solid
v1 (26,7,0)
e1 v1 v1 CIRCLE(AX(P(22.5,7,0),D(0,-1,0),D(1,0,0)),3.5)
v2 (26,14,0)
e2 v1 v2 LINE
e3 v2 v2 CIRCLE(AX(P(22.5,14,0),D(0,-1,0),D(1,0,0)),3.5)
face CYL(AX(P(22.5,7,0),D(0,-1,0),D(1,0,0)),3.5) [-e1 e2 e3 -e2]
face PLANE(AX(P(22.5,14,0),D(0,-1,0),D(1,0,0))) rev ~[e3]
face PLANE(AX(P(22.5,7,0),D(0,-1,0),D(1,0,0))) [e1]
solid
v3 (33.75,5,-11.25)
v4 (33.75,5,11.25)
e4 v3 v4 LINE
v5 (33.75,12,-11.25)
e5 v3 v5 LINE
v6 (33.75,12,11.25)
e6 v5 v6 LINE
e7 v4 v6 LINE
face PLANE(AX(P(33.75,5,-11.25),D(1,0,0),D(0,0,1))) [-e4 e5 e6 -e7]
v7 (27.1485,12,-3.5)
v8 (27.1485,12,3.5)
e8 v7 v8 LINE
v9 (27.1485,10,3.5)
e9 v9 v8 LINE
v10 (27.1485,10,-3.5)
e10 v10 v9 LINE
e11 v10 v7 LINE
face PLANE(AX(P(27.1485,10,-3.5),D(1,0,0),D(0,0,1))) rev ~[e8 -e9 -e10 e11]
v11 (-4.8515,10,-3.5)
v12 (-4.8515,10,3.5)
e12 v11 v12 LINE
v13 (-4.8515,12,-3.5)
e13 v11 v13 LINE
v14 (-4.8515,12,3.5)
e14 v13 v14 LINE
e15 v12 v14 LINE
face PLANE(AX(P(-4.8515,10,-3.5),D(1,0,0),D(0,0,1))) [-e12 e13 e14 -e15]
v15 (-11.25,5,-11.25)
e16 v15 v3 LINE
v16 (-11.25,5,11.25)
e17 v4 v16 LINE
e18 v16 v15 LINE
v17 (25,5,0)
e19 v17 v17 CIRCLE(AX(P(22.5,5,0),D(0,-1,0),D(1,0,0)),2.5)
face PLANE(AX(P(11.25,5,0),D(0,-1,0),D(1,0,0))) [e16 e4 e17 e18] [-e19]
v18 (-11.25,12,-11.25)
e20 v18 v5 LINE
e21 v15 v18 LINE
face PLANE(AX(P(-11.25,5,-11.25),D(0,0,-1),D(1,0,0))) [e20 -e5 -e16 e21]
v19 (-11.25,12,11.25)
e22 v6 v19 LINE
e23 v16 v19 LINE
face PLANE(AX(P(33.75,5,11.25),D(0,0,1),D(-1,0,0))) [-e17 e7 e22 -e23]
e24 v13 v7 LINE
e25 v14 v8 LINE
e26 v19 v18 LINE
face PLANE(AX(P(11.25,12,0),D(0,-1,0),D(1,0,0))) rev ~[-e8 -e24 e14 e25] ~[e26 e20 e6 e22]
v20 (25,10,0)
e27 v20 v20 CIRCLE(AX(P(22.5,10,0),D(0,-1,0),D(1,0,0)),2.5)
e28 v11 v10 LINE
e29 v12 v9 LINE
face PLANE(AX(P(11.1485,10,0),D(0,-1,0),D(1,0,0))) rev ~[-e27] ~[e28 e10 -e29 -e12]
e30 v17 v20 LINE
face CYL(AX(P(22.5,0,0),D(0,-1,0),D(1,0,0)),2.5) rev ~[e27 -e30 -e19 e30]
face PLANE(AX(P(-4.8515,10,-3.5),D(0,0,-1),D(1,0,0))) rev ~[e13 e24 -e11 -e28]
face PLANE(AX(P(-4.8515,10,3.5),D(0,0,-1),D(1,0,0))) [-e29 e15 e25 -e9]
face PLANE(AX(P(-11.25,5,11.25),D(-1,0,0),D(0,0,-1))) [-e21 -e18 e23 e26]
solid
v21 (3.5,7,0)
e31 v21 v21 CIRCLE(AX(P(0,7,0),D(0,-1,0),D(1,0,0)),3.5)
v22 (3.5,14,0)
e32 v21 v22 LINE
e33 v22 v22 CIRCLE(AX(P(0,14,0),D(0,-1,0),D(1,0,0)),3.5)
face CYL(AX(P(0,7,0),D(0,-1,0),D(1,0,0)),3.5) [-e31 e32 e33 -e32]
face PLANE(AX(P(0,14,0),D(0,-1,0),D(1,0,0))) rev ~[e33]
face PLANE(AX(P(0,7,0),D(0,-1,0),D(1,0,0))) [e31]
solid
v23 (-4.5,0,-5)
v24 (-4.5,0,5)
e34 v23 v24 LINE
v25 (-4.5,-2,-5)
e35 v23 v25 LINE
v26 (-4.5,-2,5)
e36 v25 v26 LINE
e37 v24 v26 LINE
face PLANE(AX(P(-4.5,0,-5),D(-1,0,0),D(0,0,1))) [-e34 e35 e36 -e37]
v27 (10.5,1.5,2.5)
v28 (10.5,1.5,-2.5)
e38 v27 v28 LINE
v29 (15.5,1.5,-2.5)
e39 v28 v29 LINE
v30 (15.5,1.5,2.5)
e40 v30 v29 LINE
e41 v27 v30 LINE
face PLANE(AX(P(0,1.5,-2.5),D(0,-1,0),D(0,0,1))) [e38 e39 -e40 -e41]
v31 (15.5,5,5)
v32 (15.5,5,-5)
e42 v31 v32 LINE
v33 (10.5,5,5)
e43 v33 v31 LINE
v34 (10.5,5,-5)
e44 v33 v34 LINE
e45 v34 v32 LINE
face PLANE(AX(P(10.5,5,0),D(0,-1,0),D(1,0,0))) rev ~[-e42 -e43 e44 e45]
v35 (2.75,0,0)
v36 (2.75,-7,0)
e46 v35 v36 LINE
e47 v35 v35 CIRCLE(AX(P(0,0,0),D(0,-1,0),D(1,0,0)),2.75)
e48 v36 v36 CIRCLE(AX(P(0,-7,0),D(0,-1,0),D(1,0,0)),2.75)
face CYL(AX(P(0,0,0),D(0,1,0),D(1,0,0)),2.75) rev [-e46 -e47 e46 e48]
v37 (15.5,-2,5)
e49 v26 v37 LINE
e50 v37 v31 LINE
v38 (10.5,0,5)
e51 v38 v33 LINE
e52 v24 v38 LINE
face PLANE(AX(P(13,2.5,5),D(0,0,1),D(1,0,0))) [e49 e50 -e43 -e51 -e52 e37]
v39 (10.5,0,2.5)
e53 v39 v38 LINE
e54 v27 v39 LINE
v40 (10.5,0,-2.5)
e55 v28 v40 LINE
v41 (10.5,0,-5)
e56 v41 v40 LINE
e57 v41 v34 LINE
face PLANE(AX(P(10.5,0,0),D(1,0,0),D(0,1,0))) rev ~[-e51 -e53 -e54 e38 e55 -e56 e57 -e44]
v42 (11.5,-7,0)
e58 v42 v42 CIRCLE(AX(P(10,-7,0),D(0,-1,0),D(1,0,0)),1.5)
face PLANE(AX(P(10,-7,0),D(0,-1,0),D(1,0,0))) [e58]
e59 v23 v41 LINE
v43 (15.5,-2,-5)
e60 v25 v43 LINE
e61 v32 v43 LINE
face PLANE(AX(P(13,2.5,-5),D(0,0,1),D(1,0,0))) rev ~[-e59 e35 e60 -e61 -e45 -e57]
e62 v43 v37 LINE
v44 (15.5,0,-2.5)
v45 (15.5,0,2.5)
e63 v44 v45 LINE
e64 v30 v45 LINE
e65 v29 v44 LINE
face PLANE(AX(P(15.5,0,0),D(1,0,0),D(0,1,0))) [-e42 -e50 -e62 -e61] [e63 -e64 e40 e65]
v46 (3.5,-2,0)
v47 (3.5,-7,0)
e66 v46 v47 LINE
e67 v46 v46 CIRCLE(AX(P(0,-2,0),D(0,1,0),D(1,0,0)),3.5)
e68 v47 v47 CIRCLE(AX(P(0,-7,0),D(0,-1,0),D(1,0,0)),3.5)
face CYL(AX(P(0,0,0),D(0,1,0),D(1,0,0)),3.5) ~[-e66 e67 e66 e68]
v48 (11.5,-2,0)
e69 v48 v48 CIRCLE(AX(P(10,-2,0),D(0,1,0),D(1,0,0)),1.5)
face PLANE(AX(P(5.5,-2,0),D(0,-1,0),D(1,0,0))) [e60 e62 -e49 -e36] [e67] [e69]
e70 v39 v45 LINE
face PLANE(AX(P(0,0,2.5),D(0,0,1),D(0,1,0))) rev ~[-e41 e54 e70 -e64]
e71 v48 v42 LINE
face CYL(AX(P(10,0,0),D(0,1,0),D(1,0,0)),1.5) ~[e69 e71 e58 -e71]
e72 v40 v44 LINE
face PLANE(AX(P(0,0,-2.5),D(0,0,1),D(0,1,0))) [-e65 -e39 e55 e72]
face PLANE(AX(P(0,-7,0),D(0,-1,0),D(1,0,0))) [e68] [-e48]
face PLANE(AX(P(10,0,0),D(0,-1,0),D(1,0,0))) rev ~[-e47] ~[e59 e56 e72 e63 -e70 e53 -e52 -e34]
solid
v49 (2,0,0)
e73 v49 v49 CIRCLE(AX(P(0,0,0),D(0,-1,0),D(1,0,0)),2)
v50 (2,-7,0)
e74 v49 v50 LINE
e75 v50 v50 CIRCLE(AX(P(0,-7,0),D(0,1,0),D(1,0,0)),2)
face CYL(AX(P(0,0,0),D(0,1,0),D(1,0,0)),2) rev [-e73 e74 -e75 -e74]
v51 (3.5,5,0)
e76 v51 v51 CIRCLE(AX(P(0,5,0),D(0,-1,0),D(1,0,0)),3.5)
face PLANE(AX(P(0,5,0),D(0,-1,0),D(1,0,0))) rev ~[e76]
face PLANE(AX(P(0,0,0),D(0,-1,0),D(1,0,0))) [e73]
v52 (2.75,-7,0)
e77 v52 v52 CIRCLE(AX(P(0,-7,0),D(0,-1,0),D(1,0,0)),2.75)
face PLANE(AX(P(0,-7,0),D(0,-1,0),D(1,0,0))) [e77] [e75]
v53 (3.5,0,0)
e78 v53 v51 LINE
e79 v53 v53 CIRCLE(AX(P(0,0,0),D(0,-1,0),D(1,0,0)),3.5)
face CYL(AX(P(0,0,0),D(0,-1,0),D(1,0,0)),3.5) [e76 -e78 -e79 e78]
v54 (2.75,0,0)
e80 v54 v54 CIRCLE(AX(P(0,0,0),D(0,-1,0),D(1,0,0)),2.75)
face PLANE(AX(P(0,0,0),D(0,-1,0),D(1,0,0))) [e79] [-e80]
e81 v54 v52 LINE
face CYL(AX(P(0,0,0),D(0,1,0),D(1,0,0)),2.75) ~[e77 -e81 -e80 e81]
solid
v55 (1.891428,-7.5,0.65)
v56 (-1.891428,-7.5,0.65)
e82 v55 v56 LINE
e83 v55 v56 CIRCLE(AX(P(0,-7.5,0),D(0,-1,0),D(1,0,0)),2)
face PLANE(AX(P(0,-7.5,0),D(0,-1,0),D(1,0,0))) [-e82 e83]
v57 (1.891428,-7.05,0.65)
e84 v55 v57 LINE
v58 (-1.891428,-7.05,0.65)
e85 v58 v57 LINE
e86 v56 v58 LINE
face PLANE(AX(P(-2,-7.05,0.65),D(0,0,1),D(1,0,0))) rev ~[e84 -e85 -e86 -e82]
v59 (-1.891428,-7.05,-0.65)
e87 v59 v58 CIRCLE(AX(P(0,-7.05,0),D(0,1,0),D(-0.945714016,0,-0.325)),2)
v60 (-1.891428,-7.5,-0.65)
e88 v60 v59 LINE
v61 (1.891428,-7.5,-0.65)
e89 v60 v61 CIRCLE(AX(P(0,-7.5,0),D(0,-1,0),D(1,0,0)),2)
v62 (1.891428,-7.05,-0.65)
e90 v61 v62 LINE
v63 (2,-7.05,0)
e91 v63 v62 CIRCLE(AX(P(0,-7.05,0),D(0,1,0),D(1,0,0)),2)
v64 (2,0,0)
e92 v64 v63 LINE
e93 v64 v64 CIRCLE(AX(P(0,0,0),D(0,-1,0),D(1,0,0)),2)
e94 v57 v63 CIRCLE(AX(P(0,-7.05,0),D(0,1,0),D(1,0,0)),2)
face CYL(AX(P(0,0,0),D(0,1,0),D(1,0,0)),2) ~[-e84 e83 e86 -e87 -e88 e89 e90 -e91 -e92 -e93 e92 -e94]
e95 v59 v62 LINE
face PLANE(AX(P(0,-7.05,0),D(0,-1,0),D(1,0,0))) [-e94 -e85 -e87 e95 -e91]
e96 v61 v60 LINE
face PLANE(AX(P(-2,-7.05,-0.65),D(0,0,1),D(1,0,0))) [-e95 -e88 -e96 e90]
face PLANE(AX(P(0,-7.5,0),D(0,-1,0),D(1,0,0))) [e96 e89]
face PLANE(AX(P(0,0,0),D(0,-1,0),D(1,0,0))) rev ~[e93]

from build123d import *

# Parameters (mm, degrees)
F0_R           = 2.75
F1_DEPTH       = 7
F2_R           = 2
F3_DEPTH       = 9.9
F3_DEPTH_BACK  = 12.8
F4_R           = 3.5
F5_DEPTH       = 5
F6_R           = 2
F7_DEPTH       = 7.5
F9_START       = 7.05
F8_W           = 4
F8_H           = 1.3
F9_DEPTH       = 2
F10_W          = 20
F10_H          = 10
F11_DEPTH      = 2
F12_W          = 5
F12_H          = 5
F13_DEPTH      = 5
F14_W          = 1.5
F14_H          = 2.5
F15_DEPTH      = 22.67
F16_R          = 3.5
F16_R_2        = 2.75
F17_DEPTH      = 7
F18_R          = 2.75
F19_DEPTH      = 6.2
F19_DEPTH_BACK = 3.1
F23_START      = -5
F23_DEPTH      = 7
F25_START      = -7
F24_R          = 3.5
F25_DEPTH      = 7
F27_START      = -10
F26_W          = 32
F26_H          = 7
F27_DEPTH      = 15
F20_R          = 1.5
F28_DEPTH      = 7
F29_R          = 2.5
F30_DEPTH      = 10


with BuildPart() as f1:
    # F0 (on Front) → F1 (new body)
    with BuildSketch(Plane.XZ):
        Circle(F0_R)
    extrude(amount=F1_DEPTH)

    # F2 (on Front) → F3 (cut, two sides)
    with BuildSketch(Plane.XZ) as f3_sk:
        Circle(F2_R)
    extrude(amount=F3_DEPTH, mode=Mode.SUBTRACT)
    extrude(f3_sk.sketch, amount=-F3_DEPTH_BACK, mode=Mode.SUBTRACT)

    # F4 (on Front) → F5 (join)
    with BuildSketch(Plane.XZ):
        Circle(F4_R)
    extrude(amount=-F5_DEPTH)


with BuildPart() as f7:
    # F6 (on Front) → F7 (new body)
    with BuildSketch(Plane.XZ):
        Circle(F6_R)
    extrude(amount=F7_DEPTH)

    # F8 (on Front) → F9 (cut)
    with BuildSketch(Plane.XZ.offset(F9_START)):
        Rectangle(F8_W, F8_H)
    extrude(amount=F9_DEPTH, mode=Mode.SUBTRACT)


with BuildPart() as f11:
    # F10 (on Front) → F11 (new body)
    with BuildSketch(Plane.XZ):
        with Locations((5.5, 0)):
            Rectangle(F10_W, F10_H)
    extrude(amount=F11_DEPTH)

    # F12 (on Top) → F13 (join, symmetric)
    with BuildSketch(Plane.XY):
        with Locations((13, 2.5)):
            Rectangle(F12_W, F12_H)
    extrude(amount=F13_DEPTH, both=True)

    # F14 (on Right) → F15 (cut)
    with BuildSketch(Plane.YZ):
        with Locations((0.75, -1.25)):
            Rectangle(F14_W, F14_H)
        with Locations((0.75, 1.25)):
            Rectangle(F14_W, F14_H)
    extrude(amount=F15_DEPTH, mode=Mode.SUBTRACT)

    # F16 (on Front) → F17 (join)
    with BuildSketch(Plane.XZ):
        Circle(F16_R)
        Circle(F16_R_2, mode=Mode.SUBTRACT)
    extrude(amount=F17_DEPTH)

    # F18 (on Front) → F19 (cut, two sides)
    with BuildSketch(Plane.XZ) as f19_sk:
        Circle(F18_R)
    extrude(amount=F19_DEPTH, mode=Mode.SUBTRACT)
    extrude(f19_sk.sketch, amount=-F19_DEPTH_BACK, mode=Mode.SUBTRACT)

    # F20 (on Front) → F28 (join)
    with BuildSketch(Plane.XZ):
        with Locations((10, 0)):
            Circle(F20_R)
    extrude(amount=F28_DEPTH)


with BuildPart() as f23:
    # F22 (on Front) → F23 (new body)
    with BuildSketch(Plane.XZ.offset(F23_START)):
        Polygon((33.75, 11.25), (11.25, 11.25), (-11.25, 11.25), (-11.25, -11.25), (11.25, -11.25), (33.75, -11.25), align=None)
    extrude(amount=-F23_DEPTH)

    # F26 (on Front) → F27 (cut)
    with BuildSketch(Plane.XZ.offset(F27_START)):
        with Locations((11.1485, 0)):
            Rectangle(F26_W, F26_H)
    extrude(amount=-F27_DEPTH, mode=Mode.SUBTRACT)

    # F29 (on Front) → F30 (cut)
    with BuildSketch(Plane.XZ):
        with Locations((22.5, 0)):
            Circle(F29_R)
    extrude(amount=-F30_DEPTH, mode=Mode.SUBTRACT)


with BuildPart() as f25:
    # F24 (on Front) → F25 (new body)
    with BuildSketch(Plane.XZ.offset(F25_START)):
        Circle(F24_R)
    extrude(amount=-F25_DEPTH)


with BuildPart() as f25b:
    # F24 (on Front) → F25, piece 2 (new body)
    with BuildSketch(Plane.XZ.offset(F25_START)):
        with Locations((22.5, 0)):
            Circle(F24_R)
    extrude(amount=-F25_DEPTH)


solid = Compound([f1.part, f7.part, f11.part, f23.part, f25.part, f25b.part])
